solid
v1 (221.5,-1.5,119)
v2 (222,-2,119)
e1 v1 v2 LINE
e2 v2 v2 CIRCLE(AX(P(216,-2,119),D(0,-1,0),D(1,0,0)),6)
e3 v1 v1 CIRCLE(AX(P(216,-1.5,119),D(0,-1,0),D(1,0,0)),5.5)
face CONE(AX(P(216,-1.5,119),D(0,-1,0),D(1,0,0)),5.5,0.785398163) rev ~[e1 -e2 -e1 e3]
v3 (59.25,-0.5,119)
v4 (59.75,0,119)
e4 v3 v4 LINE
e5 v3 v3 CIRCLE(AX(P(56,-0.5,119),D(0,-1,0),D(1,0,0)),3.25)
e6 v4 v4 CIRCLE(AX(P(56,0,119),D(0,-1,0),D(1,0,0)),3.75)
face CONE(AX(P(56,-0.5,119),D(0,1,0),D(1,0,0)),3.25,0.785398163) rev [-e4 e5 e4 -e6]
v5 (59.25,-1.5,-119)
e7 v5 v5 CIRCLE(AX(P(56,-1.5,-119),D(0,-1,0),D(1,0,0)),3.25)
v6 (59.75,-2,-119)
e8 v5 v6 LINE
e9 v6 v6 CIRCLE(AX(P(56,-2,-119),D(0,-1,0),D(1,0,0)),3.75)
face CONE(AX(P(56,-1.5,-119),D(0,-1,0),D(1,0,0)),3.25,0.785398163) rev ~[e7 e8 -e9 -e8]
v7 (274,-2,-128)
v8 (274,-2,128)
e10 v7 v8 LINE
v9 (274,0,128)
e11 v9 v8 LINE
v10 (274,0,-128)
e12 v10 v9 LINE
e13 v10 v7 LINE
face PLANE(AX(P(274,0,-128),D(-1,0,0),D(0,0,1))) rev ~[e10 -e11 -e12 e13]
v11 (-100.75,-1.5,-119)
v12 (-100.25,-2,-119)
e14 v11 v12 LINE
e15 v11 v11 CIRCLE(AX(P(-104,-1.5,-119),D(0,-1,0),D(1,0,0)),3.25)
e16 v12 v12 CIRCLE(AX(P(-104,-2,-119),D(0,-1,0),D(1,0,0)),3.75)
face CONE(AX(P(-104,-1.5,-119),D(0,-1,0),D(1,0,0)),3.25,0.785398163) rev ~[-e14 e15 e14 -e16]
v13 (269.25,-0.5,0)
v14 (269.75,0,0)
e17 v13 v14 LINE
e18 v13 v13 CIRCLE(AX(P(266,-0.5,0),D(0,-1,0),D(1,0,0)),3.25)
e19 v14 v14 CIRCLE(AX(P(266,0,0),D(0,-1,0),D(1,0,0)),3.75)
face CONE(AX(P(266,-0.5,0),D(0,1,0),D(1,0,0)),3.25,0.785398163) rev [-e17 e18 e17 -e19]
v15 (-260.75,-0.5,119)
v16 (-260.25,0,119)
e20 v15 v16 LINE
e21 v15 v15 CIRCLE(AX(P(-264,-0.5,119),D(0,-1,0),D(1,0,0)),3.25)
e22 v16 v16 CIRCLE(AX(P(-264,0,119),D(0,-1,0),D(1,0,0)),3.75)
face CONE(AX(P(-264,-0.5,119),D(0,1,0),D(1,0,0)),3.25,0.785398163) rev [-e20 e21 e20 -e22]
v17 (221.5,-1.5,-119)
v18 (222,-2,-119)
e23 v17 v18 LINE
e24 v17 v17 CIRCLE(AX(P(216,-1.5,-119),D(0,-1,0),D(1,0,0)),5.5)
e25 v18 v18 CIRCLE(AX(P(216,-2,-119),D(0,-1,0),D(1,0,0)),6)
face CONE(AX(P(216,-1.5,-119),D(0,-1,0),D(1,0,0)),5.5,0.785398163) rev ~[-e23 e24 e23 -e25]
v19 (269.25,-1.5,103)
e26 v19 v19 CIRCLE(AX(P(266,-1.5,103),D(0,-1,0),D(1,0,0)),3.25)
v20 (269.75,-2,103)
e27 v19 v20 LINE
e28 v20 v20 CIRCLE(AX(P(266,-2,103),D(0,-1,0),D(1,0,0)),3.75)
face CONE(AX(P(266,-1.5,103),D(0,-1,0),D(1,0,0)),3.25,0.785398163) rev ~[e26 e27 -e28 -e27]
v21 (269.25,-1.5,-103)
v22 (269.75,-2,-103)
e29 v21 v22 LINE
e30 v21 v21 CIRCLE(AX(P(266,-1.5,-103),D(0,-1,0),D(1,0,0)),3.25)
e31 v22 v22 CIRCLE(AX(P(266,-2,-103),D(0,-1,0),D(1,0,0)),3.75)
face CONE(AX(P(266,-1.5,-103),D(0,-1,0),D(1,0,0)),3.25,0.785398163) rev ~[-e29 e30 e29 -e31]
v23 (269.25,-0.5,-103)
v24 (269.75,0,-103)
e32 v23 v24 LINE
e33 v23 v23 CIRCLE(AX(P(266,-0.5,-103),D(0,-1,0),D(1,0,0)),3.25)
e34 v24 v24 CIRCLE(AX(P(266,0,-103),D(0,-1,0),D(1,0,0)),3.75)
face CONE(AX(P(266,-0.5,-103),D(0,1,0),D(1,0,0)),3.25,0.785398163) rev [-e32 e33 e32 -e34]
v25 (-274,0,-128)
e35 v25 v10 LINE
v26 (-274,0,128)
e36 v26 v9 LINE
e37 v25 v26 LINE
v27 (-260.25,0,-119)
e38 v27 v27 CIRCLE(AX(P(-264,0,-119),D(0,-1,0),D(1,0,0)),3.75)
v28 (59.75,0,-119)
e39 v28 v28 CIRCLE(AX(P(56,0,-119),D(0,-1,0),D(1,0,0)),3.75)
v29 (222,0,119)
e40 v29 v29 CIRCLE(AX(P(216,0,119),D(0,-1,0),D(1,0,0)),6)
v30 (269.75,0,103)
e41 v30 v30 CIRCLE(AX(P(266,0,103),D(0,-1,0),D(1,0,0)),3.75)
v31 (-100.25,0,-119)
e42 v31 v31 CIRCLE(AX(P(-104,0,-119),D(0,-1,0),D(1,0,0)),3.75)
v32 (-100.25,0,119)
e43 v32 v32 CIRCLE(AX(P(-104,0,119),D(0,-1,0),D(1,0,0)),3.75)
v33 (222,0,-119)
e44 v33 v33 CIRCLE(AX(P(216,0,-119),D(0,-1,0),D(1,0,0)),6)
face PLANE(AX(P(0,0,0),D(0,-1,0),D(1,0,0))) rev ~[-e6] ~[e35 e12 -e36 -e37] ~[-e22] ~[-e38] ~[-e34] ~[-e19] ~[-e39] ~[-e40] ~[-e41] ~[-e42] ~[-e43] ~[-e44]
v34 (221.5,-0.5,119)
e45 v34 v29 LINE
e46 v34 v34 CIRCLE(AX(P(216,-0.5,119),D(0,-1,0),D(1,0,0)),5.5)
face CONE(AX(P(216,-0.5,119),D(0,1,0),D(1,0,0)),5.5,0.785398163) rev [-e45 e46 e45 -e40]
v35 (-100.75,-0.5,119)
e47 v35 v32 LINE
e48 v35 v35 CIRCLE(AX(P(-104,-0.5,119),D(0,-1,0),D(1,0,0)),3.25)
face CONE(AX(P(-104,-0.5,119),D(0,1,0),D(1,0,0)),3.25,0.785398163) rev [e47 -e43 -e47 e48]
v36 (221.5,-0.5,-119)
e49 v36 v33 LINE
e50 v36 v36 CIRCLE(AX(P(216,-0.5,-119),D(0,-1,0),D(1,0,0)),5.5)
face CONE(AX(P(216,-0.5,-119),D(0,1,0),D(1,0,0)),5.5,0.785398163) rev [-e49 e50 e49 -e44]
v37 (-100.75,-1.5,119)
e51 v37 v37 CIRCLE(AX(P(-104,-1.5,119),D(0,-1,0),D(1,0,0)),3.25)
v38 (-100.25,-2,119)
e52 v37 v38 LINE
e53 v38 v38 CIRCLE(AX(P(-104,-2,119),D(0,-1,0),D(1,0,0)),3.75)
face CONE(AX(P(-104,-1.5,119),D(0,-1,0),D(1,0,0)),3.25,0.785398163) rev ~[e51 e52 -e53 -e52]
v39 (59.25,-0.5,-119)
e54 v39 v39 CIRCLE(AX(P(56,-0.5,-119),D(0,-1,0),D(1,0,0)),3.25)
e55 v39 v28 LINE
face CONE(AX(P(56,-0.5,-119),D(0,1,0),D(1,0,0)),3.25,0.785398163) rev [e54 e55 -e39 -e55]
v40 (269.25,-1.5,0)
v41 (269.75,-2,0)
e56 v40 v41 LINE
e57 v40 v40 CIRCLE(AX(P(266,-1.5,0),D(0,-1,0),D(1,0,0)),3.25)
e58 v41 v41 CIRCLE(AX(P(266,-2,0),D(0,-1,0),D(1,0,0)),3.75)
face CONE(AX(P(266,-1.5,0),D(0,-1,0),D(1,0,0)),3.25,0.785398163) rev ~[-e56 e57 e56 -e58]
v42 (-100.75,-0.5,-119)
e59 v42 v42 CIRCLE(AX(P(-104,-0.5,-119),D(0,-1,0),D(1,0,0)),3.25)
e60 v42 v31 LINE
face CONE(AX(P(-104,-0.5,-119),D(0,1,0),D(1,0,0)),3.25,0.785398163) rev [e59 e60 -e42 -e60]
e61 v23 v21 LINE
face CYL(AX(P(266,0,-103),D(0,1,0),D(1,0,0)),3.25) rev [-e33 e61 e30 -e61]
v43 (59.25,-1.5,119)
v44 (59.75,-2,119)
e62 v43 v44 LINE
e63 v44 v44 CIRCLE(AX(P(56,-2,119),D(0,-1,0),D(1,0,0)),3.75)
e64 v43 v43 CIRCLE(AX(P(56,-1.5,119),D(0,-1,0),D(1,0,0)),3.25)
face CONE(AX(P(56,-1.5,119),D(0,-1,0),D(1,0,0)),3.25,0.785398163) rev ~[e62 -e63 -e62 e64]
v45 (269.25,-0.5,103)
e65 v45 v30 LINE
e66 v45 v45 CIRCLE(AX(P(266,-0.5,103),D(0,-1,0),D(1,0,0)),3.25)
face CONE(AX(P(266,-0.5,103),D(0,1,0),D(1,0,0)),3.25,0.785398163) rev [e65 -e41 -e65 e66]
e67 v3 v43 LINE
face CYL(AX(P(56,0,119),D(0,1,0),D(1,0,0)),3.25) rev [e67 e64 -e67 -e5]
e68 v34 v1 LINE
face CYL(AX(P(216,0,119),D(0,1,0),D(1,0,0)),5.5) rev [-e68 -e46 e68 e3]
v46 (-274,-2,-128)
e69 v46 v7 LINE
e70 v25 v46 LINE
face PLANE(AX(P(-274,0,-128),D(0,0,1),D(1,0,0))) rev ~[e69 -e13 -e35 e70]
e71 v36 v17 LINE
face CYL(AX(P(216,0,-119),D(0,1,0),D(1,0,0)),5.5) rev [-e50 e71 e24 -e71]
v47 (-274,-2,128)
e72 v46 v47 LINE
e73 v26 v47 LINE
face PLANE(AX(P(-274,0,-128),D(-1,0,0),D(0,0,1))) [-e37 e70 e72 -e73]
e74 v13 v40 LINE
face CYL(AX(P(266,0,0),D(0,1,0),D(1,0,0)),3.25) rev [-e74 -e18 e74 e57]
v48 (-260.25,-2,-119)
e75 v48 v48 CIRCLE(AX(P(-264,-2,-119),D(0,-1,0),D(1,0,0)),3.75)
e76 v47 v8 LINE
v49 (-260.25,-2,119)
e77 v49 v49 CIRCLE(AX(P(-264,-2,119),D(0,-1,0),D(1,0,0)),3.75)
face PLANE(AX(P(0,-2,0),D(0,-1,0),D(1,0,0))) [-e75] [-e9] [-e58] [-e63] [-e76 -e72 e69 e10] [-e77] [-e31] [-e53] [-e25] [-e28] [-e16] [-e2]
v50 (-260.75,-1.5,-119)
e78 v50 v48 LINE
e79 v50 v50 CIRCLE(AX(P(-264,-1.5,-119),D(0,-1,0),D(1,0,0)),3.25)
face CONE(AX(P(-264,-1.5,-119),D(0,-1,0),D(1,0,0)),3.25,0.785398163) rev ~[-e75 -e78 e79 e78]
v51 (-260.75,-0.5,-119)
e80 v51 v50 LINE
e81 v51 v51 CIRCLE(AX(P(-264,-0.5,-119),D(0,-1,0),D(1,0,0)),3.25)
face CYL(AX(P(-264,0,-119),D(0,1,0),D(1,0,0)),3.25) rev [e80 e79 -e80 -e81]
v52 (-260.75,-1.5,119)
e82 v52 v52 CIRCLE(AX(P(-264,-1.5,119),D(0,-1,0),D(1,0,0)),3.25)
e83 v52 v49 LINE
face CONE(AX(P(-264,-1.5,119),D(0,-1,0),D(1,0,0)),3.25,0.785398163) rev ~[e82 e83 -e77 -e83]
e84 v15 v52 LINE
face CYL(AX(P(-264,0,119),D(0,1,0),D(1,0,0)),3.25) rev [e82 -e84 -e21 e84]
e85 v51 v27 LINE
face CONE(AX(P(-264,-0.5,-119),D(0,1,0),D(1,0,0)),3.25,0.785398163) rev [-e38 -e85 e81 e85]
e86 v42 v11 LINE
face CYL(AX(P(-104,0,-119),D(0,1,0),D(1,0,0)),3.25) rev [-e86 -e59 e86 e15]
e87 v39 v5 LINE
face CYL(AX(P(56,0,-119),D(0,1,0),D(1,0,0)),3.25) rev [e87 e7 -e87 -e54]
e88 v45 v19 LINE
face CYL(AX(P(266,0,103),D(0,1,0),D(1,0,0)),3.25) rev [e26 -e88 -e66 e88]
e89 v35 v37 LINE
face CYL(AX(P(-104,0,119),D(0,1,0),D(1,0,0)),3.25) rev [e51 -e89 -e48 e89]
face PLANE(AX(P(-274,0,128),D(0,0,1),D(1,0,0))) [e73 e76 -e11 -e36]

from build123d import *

# Parameters (mm, degrees)
F0_W     = 548
F0_H     = 256
F0_R     = 3.25
F0_R_2   = 5.5
F1_DEPTH = 2
F2_SIZE  = 0.5


with BuildPart() as f1:
    # F0 (on Front) → F1 (new body)
    with BuildSketch(Plane.XZ):
        Rectangle(F0_W, F0_H)
        with Locations((-264, -119)):
            Circle(F0_R, mode=Mode.SUBTRACT)
        with Locations((-104, -119)):
            Circle(F0_R, mode=Mode.SUBTRACT)
        with Locations((56, -119)):
            Circle(F0_R, mode=Mode.SUBTRACT)
        with Locations((216, -119)):
            Circle(F0_R_2, mode=Mode.SUBTRACT)
        with Locations((266, -103)):
            Circle(F0_R, mode=Mode.SUBTRACT)
        with Locations((-264, 119)):
            Circle(F0_R, mode=Mode.SUBTRACT)
        with Locations((-104, 119)):
            Circle(F0_R, mode=Mode.SUBTRACT)
        with Locations((266, 0)):
            Circle(F0_R, mode=Mode.SUBTRACT)
        with Locations((56, 119)):
            Circle(F0_R, mode=Mode.SUBTRACT)
        with Locations((266, 103)):
            Circle(F0_R, mode=Mode.SUBTRACT)
        with Locations((216, 119)):
            Circle(F0_R_2, mode=Mode.SUBTRACT)
    extrude(amount=F1_DEPTH)

    # F2
    f2_edges = [f1.edges().sort_by_distance(p)[0] for p in [
        (-260.75, -1, 119),
        (-267.25, 0, 119),
        (-267.25, -2, 119),
        (-100.75, -1, 119),
        (-107.25, 0, 119),
        (-107.25, -2, 119),
        (59.25, -1, 119),
        (52.75, 0, 119),
        (52.75, -2, 119),
        (269.25, -1, 103),
        (262.75, 0, 103),
        (262.75, -2, 103),
        (269.25, -1, 0),
        (262.75, 0, 0),
        (262.75, -2, 0),
        (269.25, -1, -103),
        (262.75, 0, -103),
        (262.75, -2, -103),
        (59.25, -1, -119),
        (52.75, 0, -119),
        (52.75, -2, -119),
        (-100.75, -1, -119),
        (-107.25, 0, -119),
        (-107.25, -2, -119),
        (-260.75, -1, -119),
        (-267.25, 0, -119),
        (-267.25, -2, -119),
        (221.5, -1, 119),
        (210.5, 0, 119),
        (210.5, -2, 119),
        (221.5, -1, -119),
        (210.5, 0, -119),
        (210.5, -2, -119),
    ]]
    chamfer(f2_edges, length=F2_SIZE)


solid = f1.part
